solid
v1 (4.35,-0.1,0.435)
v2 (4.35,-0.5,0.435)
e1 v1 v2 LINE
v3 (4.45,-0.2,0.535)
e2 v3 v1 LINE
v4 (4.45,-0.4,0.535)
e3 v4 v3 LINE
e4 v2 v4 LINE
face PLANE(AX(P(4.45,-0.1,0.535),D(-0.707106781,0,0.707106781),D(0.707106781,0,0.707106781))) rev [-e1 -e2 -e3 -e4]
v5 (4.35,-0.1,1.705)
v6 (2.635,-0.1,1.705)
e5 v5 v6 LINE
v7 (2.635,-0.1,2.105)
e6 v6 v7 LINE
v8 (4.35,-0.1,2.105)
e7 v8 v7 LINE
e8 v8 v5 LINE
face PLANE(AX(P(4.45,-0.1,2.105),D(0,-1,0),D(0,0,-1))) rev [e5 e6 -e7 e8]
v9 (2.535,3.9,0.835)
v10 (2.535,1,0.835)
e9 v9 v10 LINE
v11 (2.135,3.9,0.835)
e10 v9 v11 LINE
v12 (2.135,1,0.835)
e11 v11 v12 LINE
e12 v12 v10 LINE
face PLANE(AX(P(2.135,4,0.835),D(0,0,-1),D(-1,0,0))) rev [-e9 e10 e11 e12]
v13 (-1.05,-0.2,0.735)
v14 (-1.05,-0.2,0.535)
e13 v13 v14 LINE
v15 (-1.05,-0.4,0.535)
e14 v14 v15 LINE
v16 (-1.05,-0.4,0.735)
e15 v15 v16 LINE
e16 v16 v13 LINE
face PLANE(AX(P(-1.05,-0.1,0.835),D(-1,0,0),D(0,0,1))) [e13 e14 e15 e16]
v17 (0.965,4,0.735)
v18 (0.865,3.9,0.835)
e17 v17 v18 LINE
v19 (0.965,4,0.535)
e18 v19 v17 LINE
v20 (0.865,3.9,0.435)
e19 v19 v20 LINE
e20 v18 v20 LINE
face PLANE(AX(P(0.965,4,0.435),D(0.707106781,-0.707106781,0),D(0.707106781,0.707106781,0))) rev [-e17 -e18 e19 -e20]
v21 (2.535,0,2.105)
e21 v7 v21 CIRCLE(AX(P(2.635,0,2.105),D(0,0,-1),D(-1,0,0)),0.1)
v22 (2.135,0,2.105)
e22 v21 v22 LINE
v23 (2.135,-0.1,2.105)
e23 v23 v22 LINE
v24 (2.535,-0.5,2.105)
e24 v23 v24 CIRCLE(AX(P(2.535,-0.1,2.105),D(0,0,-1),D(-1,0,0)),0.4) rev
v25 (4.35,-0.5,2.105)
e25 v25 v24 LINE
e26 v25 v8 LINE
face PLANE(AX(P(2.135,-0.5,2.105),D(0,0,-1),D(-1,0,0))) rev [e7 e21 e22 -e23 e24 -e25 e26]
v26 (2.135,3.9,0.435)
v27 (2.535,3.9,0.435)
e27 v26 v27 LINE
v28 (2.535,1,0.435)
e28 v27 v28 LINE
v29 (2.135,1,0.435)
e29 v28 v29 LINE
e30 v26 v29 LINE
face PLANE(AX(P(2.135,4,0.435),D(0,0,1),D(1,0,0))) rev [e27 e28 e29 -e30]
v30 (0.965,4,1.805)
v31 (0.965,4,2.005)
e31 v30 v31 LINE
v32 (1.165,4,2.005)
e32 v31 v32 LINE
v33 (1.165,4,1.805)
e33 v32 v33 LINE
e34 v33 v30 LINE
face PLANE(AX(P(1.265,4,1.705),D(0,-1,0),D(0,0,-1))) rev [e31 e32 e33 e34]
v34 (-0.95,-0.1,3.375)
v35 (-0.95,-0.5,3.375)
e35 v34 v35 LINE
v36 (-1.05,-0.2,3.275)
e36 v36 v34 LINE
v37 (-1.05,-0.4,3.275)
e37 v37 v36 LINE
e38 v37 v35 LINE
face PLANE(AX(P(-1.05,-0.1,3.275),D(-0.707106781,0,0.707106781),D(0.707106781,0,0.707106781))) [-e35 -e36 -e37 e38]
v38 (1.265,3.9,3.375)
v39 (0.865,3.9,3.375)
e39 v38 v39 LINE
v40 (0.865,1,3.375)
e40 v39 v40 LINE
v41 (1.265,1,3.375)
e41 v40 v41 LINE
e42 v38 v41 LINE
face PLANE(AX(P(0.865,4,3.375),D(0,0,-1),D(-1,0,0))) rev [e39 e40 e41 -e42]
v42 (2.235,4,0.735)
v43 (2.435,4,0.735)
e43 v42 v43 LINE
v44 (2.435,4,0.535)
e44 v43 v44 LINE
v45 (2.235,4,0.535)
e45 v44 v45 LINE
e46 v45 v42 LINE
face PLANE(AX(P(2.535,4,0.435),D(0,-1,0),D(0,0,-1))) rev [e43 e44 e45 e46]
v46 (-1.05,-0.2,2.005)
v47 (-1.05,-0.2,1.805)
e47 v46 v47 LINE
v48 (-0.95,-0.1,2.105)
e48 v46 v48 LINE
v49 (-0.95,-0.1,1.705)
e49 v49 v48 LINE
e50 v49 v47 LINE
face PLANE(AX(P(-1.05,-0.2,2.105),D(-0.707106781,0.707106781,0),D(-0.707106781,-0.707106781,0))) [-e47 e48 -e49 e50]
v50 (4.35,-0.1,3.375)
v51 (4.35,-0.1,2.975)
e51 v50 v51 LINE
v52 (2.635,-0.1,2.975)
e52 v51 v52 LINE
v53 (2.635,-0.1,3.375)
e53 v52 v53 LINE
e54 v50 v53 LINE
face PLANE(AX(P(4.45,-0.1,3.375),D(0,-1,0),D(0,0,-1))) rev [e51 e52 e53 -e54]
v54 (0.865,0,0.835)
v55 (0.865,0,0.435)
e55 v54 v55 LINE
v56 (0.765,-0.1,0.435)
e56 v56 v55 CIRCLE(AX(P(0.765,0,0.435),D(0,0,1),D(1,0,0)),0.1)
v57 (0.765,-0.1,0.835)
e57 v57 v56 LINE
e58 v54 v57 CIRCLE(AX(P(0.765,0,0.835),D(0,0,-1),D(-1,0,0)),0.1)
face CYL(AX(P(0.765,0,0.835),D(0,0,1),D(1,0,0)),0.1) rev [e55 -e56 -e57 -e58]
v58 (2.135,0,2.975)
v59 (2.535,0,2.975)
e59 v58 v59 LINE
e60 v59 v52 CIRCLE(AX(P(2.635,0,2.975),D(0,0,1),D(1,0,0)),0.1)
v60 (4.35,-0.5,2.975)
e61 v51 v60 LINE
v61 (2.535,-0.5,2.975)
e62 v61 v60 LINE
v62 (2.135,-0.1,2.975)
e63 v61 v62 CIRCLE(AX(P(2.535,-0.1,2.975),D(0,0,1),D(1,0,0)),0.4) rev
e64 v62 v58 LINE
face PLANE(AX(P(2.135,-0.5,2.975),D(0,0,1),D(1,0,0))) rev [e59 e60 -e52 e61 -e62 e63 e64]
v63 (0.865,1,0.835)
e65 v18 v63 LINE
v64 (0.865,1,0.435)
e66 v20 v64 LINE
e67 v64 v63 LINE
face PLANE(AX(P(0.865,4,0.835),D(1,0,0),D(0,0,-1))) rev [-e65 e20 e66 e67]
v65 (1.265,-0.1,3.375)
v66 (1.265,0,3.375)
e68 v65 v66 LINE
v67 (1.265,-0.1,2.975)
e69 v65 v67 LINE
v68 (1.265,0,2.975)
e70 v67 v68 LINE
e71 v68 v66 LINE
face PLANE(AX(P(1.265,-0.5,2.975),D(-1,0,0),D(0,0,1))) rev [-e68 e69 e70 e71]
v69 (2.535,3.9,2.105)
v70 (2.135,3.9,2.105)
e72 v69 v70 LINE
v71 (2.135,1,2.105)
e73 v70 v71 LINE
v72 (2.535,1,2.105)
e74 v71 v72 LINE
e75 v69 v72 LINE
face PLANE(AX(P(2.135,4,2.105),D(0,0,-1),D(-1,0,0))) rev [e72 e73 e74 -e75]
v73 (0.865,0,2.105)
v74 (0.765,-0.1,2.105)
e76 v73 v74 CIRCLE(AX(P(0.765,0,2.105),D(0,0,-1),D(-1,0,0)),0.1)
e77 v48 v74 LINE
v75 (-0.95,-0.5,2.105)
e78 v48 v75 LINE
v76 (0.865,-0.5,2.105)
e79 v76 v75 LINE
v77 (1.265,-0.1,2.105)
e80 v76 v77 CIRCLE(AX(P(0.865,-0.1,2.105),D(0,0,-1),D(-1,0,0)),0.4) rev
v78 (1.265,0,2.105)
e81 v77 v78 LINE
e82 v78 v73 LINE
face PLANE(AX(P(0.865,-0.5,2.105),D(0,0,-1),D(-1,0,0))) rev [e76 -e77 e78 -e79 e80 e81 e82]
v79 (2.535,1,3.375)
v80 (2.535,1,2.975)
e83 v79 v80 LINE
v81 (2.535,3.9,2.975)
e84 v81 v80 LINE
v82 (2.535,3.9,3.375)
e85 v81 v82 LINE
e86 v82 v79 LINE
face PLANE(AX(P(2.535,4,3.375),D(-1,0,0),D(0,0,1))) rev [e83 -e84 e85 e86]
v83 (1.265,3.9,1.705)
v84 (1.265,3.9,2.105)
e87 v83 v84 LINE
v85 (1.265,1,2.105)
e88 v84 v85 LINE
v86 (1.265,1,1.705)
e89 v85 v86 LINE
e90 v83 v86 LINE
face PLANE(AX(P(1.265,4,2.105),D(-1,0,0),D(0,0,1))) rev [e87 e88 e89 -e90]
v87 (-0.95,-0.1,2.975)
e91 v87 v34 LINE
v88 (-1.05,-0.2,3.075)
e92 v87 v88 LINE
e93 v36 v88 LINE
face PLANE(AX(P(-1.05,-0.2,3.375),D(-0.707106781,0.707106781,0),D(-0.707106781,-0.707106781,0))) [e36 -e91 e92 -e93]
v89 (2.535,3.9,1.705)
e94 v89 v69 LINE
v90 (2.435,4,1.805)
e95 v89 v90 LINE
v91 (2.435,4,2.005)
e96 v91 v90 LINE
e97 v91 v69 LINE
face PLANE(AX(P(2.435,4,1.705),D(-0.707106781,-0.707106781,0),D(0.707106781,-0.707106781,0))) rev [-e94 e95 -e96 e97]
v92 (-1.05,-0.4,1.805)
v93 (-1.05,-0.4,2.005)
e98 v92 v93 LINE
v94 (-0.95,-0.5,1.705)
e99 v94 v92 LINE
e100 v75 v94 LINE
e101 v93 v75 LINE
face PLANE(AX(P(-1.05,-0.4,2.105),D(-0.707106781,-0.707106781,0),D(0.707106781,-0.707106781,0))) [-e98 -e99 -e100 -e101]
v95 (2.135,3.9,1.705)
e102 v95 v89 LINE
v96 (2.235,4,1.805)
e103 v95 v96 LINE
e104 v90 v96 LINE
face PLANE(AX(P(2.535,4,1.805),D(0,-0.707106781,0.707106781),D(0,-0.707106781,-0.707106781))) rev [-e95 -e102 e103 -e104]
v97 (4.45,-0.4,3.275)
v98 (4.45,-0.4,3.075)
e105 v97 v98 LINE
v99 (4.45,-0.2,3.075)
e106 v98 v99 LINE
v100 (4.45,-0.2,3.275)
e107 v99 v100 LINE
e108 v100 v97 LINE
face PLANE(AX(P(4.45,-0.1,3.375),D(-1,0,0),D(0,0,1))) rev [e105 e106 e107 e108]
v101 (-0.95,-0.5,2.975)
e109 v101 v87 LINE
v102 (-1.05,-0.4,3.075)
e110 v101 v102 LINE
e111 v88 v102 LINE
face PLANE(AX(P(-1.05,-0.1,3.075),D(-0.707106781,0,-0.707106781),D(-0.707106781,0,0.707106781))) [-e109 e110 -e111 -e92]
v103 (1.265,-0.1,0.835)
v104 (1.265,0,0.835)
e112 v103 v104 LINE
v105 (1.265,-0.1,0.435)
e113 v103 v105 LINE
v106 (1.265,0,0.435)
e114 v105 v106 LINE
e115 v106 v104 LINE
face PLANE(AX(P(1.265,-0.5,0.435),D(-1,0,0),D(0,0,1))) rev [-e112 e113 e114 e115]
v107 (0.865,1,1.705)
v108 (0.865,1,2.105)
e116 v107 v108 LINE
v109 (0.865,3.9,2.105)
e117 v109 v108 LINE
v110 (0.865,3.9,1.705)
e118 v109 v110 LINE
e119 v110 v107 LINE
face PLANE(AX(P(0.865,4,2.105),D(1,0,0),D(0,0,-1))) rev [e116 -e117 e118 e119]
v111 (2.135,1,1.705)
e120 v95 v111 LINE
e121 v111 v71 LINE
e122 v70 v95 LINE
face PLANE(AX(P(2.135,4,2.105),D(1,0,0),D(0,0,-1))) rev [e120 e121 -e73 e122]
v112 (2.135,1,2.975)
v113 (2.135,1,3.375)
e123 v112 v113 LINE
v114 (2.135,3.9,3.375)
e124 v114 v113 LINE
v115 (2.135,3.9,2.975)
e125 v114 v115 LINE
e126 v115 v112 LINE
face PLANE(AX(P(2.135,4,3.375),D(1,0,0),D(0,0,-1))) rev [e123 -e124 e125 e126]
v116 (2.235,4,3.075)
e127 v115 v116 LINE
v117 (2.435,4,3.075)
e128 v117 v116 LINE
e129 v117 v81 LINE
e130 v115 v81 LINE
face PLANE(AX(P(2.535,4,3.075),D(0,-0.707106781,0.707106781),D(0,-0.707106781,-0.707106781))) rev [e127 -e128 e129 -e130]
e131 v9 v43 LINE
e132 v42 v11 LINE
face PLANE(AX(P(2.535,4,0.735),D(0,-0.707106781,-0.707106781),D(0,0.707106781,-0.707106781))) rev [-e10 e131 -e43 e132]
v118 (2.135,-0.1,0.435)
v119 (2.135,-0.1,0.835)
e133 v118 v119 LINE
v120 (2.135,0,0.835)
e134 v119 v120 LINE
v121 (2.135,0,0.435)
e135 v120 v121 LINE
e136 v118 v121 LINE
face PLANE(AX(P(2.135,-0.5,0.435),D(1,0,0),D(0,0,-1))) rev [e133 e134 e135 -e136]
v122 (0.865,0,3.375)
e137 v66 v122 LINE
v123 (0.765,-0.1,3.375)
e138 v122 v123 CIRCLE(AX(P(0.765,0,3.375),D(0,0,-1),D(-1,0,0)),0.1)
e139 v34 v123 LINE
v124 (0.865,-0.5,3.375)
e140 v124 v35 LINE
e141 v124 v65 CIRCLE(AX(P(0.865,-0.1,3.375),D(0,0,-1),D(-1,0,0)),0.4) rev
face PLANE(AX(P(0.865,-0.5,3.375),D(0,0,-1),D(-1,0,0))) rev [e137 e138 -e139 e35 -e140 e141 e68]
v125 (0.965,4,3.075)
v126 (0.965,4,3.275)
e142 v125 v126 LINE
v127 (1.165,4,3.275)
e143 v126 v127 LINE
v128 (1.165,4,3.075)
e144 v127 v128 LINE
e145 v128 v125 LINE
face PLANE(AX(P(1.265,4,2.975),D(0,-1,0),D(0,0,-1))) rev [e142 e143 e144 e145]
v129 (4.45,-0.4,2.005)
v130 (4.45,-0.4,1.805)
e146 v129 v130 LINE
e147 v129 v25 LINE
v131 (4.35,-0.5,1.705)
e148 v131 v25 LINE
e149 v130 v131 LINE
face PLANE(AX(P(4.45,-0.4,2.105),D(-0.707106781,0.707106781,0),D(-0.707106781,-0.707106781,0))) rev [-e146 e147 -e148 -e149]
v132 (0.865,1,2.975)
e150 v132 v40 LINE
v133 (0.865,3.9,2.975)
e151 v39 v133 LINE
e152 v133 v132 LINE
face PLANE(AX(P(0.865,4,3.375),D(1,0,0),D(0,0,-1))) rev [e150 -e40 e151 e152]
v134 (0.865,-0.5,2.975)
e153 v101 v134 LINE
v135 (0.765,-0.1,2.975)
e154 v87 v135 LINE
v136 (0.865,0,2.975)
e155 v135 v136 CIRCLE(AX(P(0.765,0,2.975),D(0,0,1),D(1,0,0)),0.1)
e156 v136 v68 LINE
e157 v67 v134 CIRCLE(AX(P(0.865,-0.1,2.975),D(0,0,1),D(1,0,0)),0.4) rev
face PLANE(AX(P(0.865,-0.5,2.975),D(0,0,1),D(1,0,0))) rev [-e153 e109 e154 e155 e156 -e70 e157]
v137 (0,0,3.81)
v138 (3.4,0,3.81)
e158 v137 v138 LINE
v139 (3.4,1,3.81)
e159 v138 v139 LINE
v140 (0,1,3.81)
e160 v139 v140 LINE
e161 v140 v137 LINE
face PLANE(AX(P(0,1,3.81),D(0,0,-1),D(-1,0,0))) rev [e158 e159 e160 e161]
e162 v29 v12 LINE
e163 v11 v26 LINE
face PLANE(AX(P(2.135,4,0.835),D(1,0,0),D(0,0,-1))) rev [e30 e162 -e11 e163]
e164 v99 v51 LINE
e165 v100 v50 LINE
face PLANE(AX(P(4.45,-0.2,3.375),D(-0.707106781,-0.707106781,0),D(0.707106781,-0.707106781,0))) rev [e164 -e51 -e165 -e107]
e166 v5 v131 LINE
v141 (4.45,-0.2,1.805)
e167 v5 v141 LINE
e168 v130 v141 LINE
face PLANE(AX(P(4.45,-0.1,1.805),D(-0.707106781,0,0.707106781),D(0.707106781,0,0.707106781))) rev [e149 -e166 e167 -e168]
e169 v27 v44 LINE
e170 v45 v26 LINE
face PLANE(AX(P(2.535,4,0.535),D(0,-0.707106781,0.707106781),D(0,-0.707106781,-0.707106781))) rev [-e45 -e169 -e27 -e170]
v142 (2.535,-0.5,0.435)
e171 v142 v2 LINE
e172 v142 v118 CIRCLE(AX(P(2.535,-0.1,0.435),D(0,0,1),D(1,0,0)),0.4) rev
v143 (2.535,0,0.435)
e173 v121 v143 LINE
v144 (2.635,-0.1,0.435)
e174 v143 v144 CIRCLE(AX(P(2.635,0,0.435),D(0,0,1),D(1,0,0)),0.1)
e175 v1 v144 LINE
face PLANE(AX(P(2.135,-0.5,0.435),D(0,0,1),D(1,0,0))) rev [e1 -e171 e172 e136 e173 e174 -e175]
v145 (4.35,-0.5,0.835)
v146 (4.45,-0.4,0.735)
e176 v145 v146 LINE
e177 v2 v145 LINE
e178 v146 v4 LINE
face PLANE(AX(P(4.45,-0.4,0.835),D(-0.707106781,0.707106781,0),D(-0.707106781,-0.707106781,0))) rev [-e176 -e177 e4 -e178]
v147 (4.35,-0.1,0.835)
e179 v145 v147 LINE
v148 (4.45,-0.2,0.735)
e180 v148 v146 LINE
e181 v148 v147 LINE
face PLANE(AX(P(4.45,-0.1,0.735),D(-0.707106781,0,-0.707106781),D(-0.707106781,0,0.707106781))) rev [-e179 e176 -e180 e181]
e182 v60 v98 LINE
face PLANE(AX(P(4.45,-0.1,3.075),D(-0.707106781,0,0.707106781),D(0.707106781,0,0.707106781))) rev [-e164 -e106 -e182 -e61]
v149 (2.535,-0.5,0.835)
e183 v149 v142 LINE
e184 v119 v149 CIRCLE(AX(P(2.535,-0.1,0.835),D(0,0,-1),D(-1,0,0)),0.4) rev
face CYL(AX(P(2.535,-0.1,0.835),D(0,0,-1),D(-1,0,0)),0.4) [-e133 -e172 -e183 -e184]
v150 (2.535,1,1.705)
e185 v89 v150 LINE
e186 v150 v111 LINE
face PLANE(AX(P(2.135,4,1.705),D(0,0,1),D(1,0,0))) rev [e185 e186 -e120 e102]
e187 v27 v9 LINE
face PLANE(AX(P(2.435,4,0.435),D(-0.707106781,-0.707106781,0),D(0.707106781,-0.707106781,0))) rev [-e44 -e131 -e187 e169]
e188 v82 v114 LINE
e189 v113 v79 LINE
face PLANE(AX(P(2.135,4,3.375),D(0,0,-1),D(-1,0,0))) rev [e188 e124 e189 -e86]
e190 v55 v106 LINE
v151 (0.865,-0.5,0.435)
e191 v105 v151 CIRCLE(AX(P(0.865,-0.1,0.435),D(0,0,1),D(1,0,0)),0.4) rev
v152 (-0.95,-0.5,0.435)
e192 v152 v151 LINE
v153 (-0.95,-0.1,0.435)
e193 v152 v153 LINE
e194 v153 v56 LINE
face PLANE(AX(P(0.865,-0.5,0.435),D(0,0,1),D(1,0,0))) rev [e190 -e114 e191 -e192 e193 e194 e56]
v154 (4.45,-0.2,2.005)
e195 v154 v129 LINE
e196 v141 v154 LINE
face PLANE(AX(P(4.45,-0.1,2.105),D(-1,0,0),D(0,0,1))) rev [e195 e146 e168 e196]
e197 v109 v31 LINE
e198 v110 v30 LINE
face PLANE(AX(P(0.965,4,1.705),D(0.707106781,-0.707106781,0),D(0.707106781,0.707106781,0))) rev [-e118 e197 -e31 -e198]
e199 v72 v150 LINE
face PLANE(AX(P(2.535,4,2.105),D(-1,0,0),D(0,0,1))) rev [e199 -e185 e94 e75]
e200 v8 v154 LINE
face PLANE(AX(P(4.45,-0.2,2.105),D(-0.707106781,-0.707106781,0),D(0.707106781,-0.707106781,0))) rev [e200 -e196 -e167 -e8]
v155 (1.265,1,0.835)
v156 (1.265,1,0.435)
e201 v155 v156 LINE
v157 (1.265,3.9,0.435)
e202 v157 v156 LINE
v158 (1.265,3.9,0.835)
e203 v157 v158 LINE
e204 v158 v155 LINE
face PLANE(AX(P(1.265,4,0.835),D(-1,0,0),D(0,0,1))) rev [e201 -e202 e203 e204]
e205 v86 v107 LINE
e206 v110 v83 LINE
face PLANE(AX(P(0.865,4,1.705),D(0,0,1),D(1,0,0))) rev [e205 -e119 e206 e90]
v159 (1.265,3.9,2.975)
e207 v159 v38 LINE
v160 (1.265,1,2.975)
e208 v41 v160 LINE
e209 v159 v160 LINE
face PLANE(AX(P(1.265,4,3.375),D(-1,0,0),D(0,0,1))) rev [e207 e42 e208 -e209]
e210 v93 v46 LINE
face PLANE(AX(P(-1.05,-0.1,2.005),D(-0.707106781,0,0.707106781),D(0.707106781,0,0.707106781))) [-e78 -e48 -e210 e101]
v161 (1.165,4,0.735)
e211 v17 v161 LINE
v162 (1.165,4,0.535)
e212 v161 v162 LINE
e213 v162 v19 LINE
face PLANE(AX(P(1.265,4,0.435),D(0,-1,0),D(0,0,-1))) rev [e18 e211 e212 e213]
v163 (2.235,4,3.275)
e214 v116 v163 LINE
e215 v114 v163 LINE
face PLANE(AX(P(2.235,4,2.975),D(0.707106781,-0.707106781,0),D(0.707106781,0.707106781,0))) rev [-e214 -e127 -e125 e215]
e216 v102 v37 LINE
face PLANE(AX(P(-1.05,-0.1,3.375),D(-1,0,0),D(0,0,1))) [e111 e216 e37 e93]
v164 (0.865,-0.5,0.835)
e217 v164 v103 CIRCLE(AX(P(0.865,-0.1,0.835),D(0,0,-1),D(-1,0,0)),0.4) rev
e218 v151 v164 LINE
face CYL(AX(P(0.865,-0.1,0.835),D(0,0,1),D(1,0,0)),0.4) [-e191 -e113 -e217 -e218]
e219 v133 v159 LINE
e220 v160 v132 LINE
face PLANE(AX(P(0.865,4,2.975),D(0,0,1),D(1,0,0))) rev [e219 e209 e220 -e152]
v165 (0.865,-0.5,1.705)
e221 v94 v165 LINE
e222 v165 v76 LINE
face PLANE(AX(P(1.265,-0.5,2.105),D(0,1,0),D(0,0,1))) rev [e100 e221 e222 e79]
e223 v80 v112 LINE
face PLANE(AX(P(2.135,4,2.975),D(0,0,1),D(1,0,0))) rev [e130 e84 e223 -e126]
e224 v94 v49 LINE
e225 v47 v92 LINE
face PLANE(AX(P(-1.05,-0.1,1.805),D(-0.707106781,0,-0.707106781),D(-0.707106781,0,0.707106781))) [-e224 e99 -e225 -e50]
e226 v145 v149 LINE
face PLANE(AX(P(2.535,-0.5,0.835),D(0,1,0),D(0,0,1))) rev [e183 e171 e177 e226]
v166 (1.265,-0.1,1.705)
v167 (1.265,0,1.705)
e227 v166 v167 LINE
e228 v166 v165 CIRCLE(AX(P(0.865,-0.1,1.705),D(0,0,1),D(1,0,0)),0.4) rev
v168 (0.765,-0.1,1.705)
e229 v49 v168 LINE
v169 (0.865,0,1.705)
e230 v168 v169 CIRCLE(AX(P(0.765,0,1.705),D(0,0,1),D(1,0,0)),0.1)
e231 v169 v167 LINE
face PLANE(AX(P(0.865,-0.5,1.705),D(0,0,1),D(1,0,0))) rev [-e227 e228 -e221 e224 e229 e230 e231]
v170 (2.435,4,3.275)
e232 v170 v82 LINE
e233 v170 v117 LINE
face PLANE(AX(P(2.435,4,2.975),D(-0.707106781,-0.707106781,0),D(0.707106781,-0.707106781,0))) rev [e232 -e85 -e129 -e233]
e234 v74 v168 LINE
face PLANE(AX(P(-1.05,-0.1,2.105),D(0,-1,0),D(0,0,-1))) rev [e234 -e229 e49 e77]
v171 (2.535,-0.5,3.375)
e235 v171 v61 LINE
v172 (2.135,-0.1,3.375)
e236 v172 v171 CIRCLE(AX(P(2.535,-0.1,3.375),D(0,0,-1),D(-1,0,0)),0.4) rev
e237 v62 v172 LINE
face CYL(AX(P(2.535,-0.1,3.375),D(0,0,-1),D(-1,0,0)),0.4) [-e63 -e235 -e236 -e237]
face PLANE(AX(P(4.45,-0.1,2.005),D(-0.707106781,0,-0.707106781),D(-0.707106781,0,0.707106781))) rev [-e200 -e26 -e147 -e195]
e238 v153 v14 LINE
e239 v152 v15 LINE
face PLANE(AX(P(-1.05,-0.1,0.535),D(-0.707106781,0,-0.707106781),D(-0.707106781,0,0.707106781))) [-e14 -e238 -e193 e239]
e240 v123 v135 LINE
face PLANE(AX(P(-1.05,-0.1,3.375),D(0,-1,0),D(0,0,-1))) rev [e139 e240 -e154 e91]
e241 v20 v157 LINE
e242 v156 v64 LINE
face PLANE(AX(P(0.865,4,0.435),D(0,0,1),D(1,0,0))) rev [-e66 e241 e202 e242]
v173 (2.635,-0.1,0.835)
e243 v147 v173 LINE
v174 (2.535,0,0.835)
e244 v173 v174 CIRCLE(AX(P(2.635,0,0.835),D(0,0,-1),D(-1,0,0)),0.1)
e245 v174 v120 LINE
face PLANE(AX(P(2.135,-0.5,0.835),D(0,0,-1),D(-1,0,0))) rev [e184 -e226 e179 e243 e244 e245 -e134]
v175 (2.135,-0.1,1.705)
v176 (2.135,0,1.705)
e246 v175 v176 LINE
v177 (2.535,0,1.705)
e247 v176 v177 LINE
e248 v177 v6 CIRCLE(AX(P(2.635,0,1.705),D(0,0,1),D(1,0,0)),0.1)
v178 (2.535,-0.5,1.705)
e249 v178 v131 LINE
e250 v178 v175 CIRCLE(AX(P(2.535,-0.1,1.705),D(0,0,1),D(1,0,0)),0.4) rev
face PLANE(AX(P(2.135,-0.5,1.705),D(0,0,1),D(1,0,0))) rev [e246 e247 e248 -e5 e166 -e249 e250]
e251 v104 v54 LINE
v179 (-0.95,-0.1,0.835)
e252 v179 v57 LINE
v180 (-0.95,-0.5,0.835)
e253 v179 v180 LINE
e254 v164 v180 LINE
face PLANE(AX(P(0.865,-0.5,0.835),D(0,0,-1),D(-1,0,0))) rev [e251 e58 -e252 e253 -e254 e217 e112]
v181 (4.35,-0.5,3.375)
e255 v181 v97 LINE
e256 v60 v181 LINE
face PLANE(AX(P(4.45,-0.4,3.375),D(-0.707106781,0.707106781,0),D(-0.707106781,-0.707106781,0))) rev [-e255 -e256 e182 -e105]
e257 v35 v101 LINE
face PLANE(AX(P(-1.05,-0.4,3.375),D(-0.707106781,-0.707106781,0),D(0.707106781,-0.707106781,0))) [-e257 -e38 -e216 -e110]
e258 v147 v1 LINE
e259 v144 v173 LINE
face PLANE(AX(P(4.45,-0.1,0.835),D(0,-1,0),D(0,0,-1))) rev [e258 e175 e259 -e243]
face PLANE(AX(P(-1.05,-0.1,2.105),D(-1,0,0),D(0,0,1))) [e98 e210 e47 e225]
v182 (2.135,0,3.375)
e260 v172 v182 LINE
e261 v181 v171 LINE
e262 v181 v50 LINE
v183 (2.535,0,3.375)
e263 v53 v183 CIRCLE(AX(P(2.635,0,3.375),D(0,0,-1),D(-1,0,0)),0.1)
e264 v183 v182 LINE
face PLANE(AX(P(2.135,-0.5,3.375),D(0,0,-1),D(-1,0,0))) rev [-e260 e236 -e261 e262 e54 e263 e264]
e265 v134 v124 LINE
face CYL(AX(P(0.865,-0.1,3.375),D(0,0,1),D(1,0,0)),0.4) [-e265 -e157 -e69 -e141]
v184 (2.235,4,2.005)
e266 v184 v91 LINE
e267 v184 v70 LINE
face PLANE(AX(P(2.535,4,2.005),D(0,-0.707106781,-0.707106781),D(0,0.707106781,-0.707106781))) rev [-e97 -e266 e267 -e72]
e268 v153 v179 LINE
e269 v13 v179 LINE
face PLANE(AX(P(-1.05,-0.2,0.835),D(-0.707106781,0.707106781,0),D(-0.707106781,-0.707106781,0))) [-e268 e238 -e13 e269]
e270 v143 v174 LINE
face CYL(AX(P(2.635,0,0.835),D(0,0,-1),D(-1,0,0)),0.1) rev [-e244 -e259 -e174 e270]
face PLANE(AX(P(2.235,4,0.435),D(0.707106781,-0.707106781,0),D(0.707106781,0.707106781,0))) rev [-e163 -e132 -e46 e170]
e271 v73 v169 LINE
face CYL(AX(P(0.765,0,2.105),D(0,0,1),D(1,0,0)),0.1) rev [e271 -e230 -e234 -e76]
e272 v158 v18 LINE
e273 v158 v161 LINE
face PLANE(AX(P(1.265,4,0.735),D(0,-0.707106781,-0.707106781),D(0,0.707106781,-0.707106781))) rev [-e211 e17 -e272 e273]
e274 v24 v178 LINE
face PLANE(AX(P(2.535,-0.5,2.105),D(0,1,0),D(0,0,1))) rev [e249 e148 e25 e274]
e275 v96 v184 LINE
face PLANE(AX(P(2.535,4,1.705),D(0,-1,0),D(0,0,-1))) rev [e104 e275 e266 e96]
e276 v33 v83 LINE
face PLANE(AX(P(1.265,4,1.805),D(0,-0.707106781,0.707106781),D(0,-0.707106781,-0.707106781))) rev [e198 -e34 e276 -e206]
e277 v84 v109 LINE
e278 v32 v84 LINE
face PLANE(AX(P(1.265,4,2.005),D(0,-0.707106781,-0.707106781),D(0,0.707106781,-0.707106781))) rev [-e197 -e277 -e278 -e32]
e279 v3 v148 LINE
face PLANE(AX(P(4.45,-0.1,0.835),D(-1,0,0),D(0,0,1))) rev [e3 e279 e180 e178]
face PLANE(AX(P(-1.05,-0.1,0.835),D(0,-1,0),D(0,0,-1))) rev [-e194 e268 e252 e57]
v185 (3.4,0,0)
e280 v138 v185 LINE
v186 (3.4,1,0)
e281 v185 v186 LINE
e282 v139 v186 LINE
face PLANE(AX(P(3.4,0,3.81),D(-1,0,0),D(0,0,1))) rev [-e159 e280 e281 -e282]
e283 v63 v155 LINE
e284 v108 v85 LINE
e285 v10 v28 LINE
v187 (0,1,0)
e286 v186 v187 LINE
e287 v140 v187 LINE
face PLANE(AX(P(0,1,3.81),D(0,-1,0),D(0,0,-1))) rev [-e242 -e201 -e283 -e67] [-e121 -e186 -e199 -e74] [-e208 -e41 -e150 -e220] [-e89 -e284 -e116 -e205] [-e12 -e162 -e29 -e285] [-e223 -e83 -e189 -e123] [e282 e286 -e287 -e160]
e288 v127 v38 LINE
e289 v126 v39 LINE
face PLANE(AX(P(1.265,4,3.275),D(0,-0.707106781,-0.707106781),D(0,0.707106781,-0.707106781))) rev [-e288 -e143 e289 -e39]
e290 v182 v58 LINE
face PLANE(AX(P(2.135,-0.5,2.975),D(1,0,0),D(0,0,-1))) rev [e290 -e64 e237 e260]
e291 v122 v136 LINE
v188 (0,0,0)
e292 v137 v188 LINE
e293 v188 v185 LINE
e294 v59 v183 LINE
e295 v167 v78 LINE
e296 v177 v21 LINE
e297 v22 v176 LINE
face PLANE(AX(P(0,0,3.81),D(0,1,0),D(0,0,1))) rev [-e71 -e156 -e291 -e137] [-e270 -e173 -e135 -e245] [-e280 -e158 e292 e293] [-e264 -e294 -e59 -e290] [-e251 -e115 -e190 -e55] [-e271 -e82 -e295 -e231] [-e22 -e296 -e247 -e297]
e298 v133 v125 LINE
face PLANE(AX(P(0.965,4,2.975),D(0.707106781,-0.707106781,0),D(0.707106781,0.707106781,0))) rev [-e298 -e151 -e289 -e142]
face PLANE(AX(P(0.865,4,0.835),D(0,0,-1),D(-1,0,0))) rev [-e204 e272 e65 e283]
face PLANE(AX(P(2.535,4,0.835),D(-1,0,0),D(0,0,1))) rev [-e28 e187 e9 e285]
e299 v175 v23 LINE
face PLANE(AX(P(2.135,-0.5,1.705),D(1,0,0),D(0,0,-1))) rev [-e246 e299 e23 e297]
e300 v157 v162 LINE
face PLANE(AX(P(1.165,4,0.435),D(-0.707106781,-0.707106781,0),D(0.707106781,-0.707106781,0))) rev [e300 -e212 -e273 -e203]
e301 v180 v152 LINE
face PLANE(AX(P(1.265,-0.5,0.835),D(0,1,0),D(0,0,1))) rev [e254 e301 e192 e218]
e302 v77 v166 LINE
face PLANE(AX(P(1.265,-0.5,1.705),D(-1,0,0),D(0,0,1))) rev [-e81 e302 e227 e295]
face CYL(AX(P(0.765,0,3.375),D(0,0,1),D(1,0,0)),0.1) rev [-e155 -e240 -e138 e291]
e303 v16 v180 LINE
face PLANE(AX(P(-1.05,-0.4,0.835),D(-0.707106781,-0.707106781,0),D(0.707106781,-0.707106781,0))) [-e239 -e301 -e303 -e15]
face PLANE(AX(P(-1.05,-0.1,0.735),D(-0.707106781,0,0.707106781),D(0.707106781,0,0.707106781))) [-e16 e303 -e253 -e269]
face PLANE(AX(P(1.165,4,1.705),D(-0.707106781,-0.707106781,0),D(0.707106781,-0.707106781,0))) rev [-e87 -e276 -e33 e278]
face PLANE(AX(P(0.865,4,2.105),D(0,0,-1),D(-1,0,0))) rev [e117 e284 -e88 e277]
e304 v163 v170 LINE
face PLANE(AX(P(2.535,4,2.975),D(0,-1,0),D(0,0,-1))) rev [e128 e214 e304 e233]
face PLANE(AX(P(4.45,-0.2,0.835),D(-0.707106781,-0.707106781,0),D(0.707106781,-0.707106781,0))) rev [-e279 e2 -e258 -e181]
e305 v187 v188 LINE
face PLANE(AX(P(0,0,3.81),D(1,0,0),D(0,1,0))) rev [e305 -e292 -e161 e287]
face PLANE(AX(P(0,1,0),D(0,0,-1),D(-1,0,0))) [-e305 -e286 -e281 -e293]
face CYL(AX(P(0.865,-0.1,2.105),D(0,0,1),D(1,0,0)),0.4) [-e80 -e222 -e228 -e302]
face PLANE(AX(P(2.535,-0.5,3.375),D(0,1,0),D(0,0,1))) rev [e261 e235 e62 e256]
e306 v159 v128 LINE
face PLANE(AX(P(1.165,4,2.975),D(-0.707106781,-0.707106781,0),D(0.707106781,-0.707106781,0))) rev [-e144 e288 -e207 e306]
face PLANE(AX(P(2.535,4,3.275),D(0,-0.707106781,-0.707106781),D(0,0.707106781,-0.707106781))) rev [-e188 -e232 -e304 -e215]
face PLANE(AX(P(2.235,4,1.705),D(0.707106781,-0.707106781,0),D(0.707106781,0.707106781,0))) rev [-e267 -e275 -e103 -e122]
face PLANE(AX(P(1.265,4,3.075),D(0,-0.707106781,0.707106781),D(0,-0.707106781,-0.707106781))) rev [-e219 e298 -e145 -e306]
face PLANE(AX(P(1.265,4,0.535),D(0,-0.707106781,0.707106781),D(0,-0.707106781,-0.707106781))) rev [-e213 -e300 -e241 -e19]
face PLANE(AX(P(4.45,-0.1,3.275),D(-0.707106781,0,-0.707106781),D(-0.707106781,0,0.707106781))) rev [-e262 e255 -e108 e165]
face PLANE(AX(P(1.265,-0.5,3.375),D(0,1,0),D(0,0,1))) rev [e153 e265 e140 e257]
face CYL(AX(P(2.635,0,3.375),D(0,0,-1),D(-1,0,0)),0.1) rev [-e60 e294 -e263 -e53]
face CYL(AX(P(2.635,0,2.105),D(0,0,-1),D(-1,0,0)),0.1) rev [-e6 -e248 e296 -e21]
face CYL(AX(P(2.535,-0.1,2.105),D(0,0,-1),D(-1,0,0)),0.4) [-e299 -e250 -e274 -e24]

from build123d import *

# Parameters (mm, degrees)
SKIZZE1_W                       = 3.4
SKIZZE1_H                       = 1
AUFSATZ_LINEAR_AUSTRAGEN1_DEPTH = 3.81
SKIZZE3_W                       = 0.4
SKIZZE3_H                       = 0.4
AUFSATZ_LINEAR_AUSTRAGEN3_DEPTH = 0.5
SKIZZE4_W                       = 0.4
SKIZZE4_H                       = 0.4
AUFSATZ_LINEAR_AUSTRAGEN4_DEPTH = 1.915
SKIZZE5_W                       = 0.4
SKIZZE5_H                       = 0.4
AUFSATZ_LINEAR_AUSTRAGEN5_DEPTH = 1.915
SKIZZE6_W                       = 0.4
SKIZZE6_H                       = 0.4
AUFSATZ_LINEAR_AUSTRAGEN6_DEPTH = 3
FASE2_SIZE                      = 0.1
VERRUNDUNG1_R                   = 0.1
VERRUNDUNG2_R                   = 0.4


with BuildPart() as part:
    # Skizze1 → Aufsatz-Linear austragen1 (new body)
    with BuildSketch(Plane.XY):
        with Locations((1.7, 0.5)):
            Rectangle(SKIZZE1_W, SKIZZE1_H)
    extrude(amount=AUFSATZ_LINEAR_AUSTRAGEN1_DEPTH)

    # Skizze3 → Aufsatz-Linear austragen3 (add)
    with BuildSketch(Plane.XZ):
        with Locations((1.065, 3.175)):
            Rectangle(SKIZZE3_W, SKIZZE3_H)
        with Locations((2.335, 3.175)):
            Rectangle(SKIZZE3_W, SKIZZE3_H)
        with Locations((1.065, 1.905)):
            Rectangle(SKIZZE3_W, SKIZZE3_H)
        with Locations((2.335, 1.905)):
            Rectangle(SKIZZE3_W, SKIZZE3_H)
        with Locations((1.065, 0.635)):
            Rectangle(SKIZZE3_W, SKIZZE3_H)
        with Locations((2.335, 0.635)):
            Rectangle(SKIZZE3_W, SKIZZE3_H)
    extrude(amount=AUFSATZ_LINEAR_AUSTRAGEN3_DEPTH)

    # Skizze4 → Aufsatz-Linear austragen4 (add)
    with BuildSketch(Plane(origin=(2.535, 0, 0), x_dir=(0, 0, -1), z_dir=(1, 0, 0))):
        with Locations((-3.175, -0.3)):
            Rectangle(SKIZZE4_W, SKIZZE4_H)
        with Locations((-1.905, -0.3)):
            Rectangle(SKIZZE4_W, SKIZZE4_H)
        with Locations((-0.635, -0.3)):
            Rectangle(SKIZZE4_W, SKIZZE4_H)
    extrude(amount=AUFSATZ_LINEAR_AUSTRAGEN4_DEPTH)

    # Skizze5 → Aufsatz-Linear austragen5 (add)
    with BuildSketch(Plane.ZY.offset(-0.865)):
        with Locations((3.175, -0.3)):
            Rectangle(SKIZZE5_W, SKIZZE5_H)
        with Locations((1.905, -0.3)):
            Rectangle(SKIZZE5_W, SKIZZE5_H)
        with Locations((0.635, -0.3)):
            Rectangle(SKIZZE5_W, SKIZZE5_H)
    extrude(amount=AUFSATZ_LINEAR_AUSTRAGEN5_DEPTH)

    # Skizze6 → Aufsatz-Linear austragen6 (add)
    with BuildSketch(Plane(origin=(0, 1, 0), x_dir=(1, 0, 0), z_dir=(0, 1, 0))):
        with Locations((1.065, -0.635)):
            Rectangle(SKIZZE6_W, SKIZZE6_H)
        with Locations((2.335, -0.635)):
            Rectangle(SKIZZE6_W, SKIZZE6_H)
        with Locations((1.065, -1.905)):
            Rectangle(SKIZZE6_W, SKIZZE6_H)
        with Locations((2.335, -1.905)):
            Rectangle(SKIZZE6_W, SKIZZE6_H)
        with Locations((1.065, -3.175)):
            Rectangle(SKIZZE6_W, SKIZZE6_H)
        with Locations((2.335, -3.175)):
            Rectangle(SKIZZE6_W, SKIZZE6_H)
    extrude(amount=AUFSATZ_LINEAR_AUSTRAGEN6_DEPTH)

    # Fase2
    fase2_edges = [part.edges().sort_by_distance(p)[0] for p in [
        (4.45, -0.3, 0.835),
        (4.45, -0.5, 0.635),
        (4.45, -0.3, 0.435),
        (4.45, -0.1, 0.635),
        (-1.05, -0.3, 3.375),
        (-1.05, -0.1, 3.175),
        (-1.05, -0.3, 2.975),
        (-1.05, -0.5, 3.175),
        (-1.05, -0.3, 2.105),
        (-1.05, -0.1, 1.905),
        (-1.05, -0.3, 1.705),
        (-1.05, -0.5, 1.905),
        (-1.05, -0.3, 0.835),
        (-1.05, -0.1, 0.635),
        (-1.05, -0.3, 0.435),
        (-1.05, -0.5, 0.635),
        (1.265, 4, 0.635),
        (1.065, 4, 0.435),
        (0.865, 4, 0.635),
        (1.065, 4, 0.835),
        (2.535, 4, 0.635),
        (2.335, 4, 0.435),
        (2.135, 4, 0.635),
        (2.335, 4, 0.835),
        (1.265, 4, 1.905),
        (1.065, 4, 1.705),
        (0.865, 4, 1.905),
        (1.065, 4, 2.105),
        (2.535, 4, 1.905),
        (2.335, 4, 1.705),
        (2.135, 4, 1.905),
        (2.335, 4, 2.105),
        (1.265, 4, 3.175),
        (1.065, 4, 2.975),
        (0.865, 4, 3.175),
        (1.065, 4, 3.375),
        (2.535, 4, 3.175),
        (2.335, 4, 2.975),
        (2.135, 4, 3.175),
        (2.335, 4, 3.375),
        (4.45, -0.3, 3.375),
        (4.45, -0.5, 3.175),
        (4.45, -0.3, 2.975),
        (4.45, -0.1, 3.175),
        (4.45, -0.3, 2.105),
        (4.45, -0.5, 1.905),
        (4.45, -0.3, 1.705),
        (4.45, -0.1, 1.905),
    ]]
    chamfer(fase2_edges, length=FASE2_SIZE)

    # Verrundung1
    verrundung1_edges = [part.edges().sort_by_distance(p)[0] for p in [
        (0.865, -0.1, 3.175),
        (0.865, -0.1, 1.905),
        (0.865, -0.1, 0.635),
        (2.535, -0.1, 3.175),
        (2.535, -0.1, 1.905),
        (2.535, -0.1, 0.635),
    ]]
    fillet(verrundung1_edges, radius=VERRUNDUNG1_R - 0.0001)  # a hair under: the kernel refuses the full size

    # Verrundung2
    verrundung2_edges = [part.edges().sort_by_distance(p)[0] for p in [
        (1.265, -0.5, 3.175),
        (2.135, -0.5, 3.175),
        (1.265, -0.5, 1.905),
        (2.135, -0.5, 1.905),
        (1.265, -0.5, 0.635),
        (2.135, -0.5, 0.635),
    ]]
    fillet(verrundung2_edges, radius=VERRUNDUNG2_R)


solid = part.part
